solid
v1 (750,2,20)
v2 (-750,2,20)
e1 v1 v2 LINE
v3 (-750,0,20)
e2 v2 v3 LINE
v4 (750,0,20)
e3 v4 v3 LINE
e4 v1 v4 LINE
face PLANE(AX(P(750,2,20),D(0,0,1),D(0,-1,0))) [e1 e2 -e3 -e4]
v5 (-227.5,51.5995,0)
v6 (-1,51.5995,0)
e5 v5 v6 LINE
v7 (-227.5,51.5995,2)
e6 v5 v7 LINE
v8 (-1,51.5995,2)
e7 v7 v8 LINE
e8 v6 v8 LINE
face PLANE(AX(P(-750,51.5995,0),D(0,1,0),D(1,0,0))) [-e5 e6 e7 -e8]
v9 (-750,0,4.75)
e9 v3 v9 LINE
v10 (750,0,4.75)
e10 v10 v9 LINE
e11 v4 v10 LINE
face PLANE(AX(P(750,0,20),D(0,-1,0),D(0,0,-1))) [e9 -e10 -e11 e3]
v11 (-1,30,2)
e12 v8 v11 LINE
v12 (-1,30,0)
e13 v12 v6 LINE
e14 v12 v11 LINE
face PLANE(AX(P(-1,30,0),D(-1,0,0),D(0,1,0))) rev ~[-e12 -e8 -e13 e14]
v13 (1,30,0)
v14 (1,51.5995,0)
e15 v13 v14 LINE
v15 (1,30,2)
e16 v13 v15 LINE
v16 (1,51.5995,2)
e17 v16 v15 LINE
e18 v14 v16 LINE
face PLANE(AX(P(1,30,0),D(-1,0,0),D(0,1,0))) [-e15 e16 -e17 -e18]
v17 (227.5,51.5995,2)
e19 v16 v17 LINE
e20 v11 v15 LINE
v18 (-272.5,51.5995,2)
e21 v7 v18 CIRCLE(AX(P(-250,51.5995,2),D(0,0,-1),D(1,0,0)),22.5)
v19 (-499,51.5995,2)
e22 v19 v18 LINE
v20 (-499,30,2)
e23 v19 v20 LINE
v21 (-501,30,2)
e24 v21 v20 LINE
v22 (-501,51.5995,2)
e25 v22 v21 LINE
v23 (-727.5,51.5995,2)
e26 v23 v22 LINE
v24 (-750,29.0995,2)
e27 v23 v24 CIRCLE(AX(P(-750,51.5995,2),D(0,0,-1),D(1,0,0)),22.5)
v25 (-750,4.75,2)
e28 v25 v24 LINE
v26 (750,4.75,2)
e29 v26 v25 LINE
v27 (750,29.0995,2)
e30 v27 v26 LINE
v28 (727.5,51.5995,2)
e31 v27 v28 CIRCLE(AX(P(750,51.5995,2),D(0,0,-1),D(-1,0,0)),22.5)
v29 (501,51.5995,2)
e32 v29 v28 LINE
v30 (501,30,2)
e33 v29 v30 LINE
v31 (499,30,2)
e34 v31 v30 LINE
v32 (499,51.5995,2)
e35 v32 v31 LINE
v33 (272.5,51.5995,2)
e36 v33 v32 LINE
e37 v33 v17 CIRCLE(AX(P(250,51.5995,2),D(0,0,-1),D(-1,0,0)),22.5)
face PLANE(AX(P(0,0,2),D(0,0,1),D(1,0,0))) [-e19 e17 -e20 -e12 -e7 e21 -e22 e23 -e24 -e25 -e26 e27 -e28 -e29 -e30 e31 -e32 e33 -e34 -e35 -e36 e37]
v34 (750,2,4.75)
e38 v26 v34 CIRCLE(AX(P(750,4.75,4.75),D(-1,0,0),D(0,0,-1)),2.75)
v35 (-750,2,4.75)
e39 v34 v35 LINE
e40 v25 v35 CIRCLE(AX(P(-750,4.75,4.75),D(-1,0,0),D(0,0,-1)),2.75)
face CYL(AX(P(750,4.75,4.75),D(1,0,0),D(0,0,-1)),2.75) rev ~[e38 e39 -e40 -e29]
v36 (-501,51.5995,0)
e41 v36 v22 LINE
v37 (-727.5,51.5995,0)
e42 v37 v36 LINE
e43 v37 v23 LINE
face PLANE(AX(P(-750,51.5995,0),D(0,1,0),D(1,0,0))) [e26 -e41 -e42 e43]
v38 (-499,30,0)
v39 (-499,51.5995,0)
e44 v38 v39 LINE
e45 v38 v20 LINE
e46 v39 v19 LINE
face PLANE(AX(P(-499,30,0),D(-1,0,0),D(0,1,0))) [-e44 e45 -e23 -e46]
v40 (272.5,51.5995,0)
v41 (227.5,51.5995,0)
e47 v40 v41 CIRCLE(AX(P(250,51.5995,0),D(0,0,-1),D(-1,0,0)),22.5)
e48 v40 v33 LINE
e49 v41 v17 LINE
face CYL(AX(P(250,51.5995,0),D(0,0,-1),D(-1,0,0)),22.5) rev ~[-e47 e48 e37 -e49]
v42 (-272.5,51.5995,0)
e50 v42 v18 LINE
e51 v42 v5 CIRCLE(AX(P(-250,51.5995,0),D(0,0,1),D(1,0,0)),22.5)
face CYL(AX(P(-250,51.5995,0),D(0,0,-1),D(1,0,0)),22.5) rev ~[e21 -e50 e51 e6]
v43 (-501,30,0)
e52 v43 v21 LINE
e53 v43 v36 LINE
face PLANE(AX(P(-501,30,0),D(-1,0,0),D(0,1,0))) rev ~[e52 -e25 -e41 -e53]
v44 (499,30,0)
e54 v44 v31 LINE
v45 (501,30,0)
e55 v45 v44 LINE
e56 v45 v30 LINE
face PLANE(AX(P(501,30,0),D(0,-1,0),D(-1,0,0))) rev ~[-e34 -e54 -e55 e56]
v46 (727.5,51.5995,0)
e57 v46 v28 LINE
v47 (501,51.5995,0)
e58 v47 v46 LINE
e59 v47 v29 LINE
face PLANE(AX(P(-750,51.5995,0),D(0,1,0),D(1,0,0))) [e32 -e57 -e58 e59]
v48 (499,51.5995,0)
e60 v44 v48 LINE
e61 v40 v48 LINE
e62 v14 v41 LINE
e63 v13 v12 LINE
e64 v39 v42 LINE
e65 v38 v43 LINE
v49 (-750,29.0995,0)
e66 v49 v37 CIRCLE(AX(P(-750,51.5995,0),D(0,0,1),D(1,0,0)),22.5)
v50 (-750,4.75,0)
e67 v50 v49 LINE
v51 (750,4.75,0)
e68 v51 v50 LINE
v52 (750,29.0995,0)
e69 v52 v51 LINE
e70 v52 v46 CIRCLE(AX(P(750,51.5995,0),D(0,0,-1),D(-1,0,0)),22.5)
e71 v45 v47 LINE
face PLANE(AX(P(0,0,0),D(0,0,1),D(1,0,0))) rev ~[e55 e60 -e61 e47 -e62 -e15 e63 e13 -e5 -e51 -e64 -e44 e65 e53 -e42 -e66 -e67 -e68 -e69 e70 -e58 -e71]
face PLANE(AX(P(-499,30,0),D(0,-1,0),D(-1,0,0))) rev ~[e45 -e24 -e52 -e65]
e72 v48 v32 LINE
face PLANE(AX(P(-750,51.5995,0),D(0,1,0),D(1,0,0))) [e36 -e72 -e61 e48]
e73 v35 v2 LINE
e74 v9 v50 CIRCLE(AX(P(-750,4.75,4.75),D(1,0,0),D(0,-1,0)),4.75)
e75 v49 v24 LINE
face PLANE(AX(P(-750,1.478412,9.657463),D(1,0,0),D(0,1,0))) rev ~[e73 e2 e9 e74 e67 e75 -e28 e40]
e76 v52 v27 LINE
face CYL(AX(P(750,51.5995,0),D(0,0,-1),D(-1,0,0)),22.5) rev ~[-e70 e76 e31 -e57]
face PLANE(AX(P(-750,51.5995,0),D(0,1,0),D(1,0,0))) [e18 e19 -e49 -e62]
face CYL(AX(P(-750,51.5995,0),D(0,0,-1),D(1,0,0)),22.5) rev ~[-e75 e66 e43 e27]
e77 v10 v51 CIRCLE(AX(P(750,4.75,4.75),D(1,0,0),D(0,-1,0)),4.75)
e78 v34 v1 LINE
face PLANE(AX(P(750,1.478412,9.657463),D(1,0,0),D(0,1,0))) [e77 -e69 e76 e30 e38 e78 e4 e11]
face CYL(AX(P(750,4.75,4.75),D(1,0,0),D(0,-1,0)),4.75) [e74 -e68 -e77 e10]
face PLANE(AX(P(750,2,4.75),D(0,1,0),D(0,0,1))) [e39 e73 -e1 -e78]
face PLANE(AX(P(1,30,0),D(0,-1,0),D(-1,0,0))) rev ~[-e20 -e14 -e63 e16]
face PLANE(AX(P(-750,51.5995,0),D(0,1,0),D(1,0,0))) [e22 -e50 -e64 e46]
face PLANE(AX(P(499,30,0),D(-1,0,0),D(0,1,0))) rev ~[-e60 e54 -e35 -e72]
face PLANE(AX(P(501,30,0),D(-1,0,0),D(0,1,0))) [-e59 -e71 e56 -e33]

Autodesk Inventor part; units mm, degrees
ref_plane "YZ Plane" through (0, 0, 0) normal (1, 0, 0) x (0, 1, 0)
ref_plane "XZ Plane" through (0, 0, 0) normal (0, 1, 0) x (-1, 0, 0)
ref_plane "XY Plane" through (0, 0, 0) normal (0, 0, 1) x (1, 0, 0)
sketch "Sketch1" plane through (0, 0, 0) normal (0, 0, 1) x (1, 0, 0)
  line L0 (-750, 51.5995) -> (750, 51.5995)
  line L1 (750, 51.5995) -> (750, 0)
  line L2 (750, 0) -> (-750, 0)
  line L3 (-750, 0) -> (-750, 51.5995)
  point P0 (0, 0)
  point P1 (0, 0)
  dimension "d0" = 1500
  dimension "d1" = 51.5994
extrude "Plate1" add sketch "Sketch1" along normal blind 2
sketch "Sketch2" plane through (750, 2, 0) normal (0, -1, 0) x (1, 0, 0)
  line L0 (-1500, 0) -> (0, 0)
  line L1 (0, 0) -> (0, 20)
  line L2 (0, 20) -> (-1500, 20)
  line L3 (-1500, 20) -> (-1500, 0)
edge flange "Flange1" height 20 angle 90 thickness 2 bend radius 2.75 thickness toward (0, -1, 0) relief round relief width 2 relief depth 1 edges at (0, 0, 2) wall of the first edge with corners at (-750, 2, 0) (750, 2, 0) (750, 2, 20) (-750, 2, 20)
bend "Bend1"
corner "Corner1"
sketch "Sketch5" plane through (0, 0, 0) normal (0, 0, -1) x (-1, 0, 0)
  line L0 (750, 51.5995) -> (-750, 51.5995) projected
  line L1 (-1, 30) -> (-1, 51.5995)
  line L2 (750, 0) -> (-750, 0) projected
  line L3 (-1, 30) -> (1, 30)
  line L4 (1, 30) -> (1, 51.5995)
  point P0 (0, 0)
  point P1 (0, 30)
  point P2 (0, 0)
  dimension "d27" = 2
  dimension "d28" = 30
extrude "Extrusion1" cut sketch "Sketch5" against normal through all
pattern_linear "Rectangular Pattern1" count 3 spacing 500 along (1, 0, 0) of "Extrusion1" first direction both ways yes
sketch "Sketch6" plane through (0, 0, 0) normal (0, 0, -1) x (-1, 0, 0)
  line L0 (-750, 51.5995) -> (-750, 4.75) projected
  circle A0 centre (-750, 51.5995) radius 22.5
  line L1 (-750, 51.5995) -> (750, 51.5995) projected
  line L2 (-1, 30) -> (-1, 51.5995) construction
  line L3 (-499, 51.5995) -> (-499, 30) construction
  line L4 (-499, 30) -> (-1, 30) construction
  circle A1 centre (-250, 51.5995) radius 22.5
  point P0 (0, 0)
  point P1 (-727.5, 51.5995)
  point P2 (-750, 29.0995)
  point P3 (-250, 30)
  point P4 (-227.5, 51.5995)
  point P5 (-272.5, 51.5995)
  dimension "d24" = 45
extrude "Extrusion2" cut sketch "Sketch6" against normal through all contours L1 A0 L0 | L1 A1 picked at (-748.3311, 36.7875) picked at (-245.5216, 43.6323)
mirror "Mirror1" about plane through (0, 0, 0) normal (1, 0, 0) of "Extrusion2"
sketch "Sketch7" plane through (0, 0, 2) normal (0, 0, 1) x (1, 0, 0)
  arc A0 (-750, 29.0995) -> (-727.5, 51.5995) centre (-750, 51.5995) ccw projected
  line L0 (-750, 4.75) -> (-750, 29.0995) projected
  line L1 (-750, 4.75) -> (750, 4.75) projected
  line L2 (750, 29.0995) -> (750, 4.75) projected
  arc A1 (727.5, 51.5995) -> (750, 29.0995) centre (750, 51.5995) ccw projected
  line L3 (501, 51.5995) -> (727.5, 51.5995) projected
  line L4 (501, 51.5995) -> (501, 30) projected
  line L5 (501, 30) -> (499, 30) projected
  line L6 (499, 30) -> (499, 51.5995) projected
  line L7 (1, 51.5995) -> (227.5, 51.5995) projected
  line L8 (1, 51.5995) -> (1, 30) projected
  line L9 (1, 30) -> (-1, 30) projected
  line L10 (-1, 30) -> (-1, 51.5995) projected
  line L11 (-499, 51.5995) -> (-272.5, 51.5995) projected
  line L12 (-499, 51.5995) -> (-499, 30) projected
  line L13 (-499, 30) -> (-501, 30) projected
  line L14 (-501, 30) -> (-501, 51.5995) projected
  line L15 (-727.5, 51.5995) -> (-501, 51.5995) projected
  line L16 (650, 4.75) -> (650, 51.5995) construction
  line L17 (-750, 4.75) -> (750, 4.75) projected
  line L18 (646, 24.7106) -> (650, 31.6388)
  line L19 (650, 31.6388) -> (654, 24.7106)
  line L20 (654, 24.7106) -> (646, 24.7106)
  line L21 (650, 31.6388) -> (650, 24.7106) construction
  line L22 (272.5, 51.5995) -> (499, 51.5995) projected
  arc A2 (227.5, 51.5995) -> (272.5, 51.5995) centre (250, 51.5995) ccw projected
  line L23 (-227.5, 51.5995) -> (-1, 51.5995) projected
  arc A3 (-272.5, 51.5995) -> (-227.5, 51.5995) centre (-250, 51.5995) ccw projected
  point P0 (0, 0)
  point P1 (650, 28.1747)
  dimension "d29" = 100
  dimension "d30" = 8
extrude "Extrusion3" [suppressed]
mirror "Mirror2" [suppressed]
sketch "Sketch8" plane through (0, 0, 2) normal (0, 0, 1) x (1, 0, 0)
  line L0 (494, 46.5995) -> (494, 34.5995) construction
  line L1 (494, 34.5995) -> (294, 34.5995) construction
  line L2 (294, 34.5995) -> (294, 46.5995) construction
  line L3 (294, 46.5995) -> (494, 46.5995) construction
  line L4 (501, 51.5995) -> (727.5, 51.5995) projected
  line L5 (272.5, 51.5995) -> (499, 51.5995) projected
  point P0 (0, 0)
  dimension "d35" = 200
  dimension "d36" = 12
  dimension "d39" = 5
  dimension "d40" = 5
mark "Mark1"
equation "\"d28\" = Стрингер_глубина_паза"
equation "\"d1\" = Стрингер_5"
equation "\"d27\" = d18"
equation "\"d2\" = Thickness"
equation "\"d3\" = BendReliefWidth"
equation "\"d4\" = BendReliefDepth"
equation "\"d5\" = MinimumRemnant"
equation "\"d6\" = TransitionRadius"
equation "\"d9\" = BendRadius"
equation "\"d10\" = CornerReliefSize"
equation "\"d11\" = GapSize"
equation "\"d12\" = JacobiRadiusSize"
equation "\"BendReliefWidth\" = Thickness"
equation "\"BendReliefDepth\" = 0.5 * Thickness"
equation "\"CornerReliefSize\" = 4 * Thickness"
equation "\"MinimumRemnant\" = 2 * Thickness"
equation "\"TransitionRadius\" = BendRadius"
equation "\"JacobiRadiusSize\" = BendRadius"
equation "\"GapSize\" = Thickness"
equation "\"d18\" = Thickness"
equation "\"Стрингер_5\" = 51.599453"
equation "\"Thickness\" = 2"
equation "\"BendRadius\" = 2.75"
equation "\"Стрингер_глубина_паза\" = 30"
properties part number "MSC 065 stringer board ###" material "Stainless Steel"
